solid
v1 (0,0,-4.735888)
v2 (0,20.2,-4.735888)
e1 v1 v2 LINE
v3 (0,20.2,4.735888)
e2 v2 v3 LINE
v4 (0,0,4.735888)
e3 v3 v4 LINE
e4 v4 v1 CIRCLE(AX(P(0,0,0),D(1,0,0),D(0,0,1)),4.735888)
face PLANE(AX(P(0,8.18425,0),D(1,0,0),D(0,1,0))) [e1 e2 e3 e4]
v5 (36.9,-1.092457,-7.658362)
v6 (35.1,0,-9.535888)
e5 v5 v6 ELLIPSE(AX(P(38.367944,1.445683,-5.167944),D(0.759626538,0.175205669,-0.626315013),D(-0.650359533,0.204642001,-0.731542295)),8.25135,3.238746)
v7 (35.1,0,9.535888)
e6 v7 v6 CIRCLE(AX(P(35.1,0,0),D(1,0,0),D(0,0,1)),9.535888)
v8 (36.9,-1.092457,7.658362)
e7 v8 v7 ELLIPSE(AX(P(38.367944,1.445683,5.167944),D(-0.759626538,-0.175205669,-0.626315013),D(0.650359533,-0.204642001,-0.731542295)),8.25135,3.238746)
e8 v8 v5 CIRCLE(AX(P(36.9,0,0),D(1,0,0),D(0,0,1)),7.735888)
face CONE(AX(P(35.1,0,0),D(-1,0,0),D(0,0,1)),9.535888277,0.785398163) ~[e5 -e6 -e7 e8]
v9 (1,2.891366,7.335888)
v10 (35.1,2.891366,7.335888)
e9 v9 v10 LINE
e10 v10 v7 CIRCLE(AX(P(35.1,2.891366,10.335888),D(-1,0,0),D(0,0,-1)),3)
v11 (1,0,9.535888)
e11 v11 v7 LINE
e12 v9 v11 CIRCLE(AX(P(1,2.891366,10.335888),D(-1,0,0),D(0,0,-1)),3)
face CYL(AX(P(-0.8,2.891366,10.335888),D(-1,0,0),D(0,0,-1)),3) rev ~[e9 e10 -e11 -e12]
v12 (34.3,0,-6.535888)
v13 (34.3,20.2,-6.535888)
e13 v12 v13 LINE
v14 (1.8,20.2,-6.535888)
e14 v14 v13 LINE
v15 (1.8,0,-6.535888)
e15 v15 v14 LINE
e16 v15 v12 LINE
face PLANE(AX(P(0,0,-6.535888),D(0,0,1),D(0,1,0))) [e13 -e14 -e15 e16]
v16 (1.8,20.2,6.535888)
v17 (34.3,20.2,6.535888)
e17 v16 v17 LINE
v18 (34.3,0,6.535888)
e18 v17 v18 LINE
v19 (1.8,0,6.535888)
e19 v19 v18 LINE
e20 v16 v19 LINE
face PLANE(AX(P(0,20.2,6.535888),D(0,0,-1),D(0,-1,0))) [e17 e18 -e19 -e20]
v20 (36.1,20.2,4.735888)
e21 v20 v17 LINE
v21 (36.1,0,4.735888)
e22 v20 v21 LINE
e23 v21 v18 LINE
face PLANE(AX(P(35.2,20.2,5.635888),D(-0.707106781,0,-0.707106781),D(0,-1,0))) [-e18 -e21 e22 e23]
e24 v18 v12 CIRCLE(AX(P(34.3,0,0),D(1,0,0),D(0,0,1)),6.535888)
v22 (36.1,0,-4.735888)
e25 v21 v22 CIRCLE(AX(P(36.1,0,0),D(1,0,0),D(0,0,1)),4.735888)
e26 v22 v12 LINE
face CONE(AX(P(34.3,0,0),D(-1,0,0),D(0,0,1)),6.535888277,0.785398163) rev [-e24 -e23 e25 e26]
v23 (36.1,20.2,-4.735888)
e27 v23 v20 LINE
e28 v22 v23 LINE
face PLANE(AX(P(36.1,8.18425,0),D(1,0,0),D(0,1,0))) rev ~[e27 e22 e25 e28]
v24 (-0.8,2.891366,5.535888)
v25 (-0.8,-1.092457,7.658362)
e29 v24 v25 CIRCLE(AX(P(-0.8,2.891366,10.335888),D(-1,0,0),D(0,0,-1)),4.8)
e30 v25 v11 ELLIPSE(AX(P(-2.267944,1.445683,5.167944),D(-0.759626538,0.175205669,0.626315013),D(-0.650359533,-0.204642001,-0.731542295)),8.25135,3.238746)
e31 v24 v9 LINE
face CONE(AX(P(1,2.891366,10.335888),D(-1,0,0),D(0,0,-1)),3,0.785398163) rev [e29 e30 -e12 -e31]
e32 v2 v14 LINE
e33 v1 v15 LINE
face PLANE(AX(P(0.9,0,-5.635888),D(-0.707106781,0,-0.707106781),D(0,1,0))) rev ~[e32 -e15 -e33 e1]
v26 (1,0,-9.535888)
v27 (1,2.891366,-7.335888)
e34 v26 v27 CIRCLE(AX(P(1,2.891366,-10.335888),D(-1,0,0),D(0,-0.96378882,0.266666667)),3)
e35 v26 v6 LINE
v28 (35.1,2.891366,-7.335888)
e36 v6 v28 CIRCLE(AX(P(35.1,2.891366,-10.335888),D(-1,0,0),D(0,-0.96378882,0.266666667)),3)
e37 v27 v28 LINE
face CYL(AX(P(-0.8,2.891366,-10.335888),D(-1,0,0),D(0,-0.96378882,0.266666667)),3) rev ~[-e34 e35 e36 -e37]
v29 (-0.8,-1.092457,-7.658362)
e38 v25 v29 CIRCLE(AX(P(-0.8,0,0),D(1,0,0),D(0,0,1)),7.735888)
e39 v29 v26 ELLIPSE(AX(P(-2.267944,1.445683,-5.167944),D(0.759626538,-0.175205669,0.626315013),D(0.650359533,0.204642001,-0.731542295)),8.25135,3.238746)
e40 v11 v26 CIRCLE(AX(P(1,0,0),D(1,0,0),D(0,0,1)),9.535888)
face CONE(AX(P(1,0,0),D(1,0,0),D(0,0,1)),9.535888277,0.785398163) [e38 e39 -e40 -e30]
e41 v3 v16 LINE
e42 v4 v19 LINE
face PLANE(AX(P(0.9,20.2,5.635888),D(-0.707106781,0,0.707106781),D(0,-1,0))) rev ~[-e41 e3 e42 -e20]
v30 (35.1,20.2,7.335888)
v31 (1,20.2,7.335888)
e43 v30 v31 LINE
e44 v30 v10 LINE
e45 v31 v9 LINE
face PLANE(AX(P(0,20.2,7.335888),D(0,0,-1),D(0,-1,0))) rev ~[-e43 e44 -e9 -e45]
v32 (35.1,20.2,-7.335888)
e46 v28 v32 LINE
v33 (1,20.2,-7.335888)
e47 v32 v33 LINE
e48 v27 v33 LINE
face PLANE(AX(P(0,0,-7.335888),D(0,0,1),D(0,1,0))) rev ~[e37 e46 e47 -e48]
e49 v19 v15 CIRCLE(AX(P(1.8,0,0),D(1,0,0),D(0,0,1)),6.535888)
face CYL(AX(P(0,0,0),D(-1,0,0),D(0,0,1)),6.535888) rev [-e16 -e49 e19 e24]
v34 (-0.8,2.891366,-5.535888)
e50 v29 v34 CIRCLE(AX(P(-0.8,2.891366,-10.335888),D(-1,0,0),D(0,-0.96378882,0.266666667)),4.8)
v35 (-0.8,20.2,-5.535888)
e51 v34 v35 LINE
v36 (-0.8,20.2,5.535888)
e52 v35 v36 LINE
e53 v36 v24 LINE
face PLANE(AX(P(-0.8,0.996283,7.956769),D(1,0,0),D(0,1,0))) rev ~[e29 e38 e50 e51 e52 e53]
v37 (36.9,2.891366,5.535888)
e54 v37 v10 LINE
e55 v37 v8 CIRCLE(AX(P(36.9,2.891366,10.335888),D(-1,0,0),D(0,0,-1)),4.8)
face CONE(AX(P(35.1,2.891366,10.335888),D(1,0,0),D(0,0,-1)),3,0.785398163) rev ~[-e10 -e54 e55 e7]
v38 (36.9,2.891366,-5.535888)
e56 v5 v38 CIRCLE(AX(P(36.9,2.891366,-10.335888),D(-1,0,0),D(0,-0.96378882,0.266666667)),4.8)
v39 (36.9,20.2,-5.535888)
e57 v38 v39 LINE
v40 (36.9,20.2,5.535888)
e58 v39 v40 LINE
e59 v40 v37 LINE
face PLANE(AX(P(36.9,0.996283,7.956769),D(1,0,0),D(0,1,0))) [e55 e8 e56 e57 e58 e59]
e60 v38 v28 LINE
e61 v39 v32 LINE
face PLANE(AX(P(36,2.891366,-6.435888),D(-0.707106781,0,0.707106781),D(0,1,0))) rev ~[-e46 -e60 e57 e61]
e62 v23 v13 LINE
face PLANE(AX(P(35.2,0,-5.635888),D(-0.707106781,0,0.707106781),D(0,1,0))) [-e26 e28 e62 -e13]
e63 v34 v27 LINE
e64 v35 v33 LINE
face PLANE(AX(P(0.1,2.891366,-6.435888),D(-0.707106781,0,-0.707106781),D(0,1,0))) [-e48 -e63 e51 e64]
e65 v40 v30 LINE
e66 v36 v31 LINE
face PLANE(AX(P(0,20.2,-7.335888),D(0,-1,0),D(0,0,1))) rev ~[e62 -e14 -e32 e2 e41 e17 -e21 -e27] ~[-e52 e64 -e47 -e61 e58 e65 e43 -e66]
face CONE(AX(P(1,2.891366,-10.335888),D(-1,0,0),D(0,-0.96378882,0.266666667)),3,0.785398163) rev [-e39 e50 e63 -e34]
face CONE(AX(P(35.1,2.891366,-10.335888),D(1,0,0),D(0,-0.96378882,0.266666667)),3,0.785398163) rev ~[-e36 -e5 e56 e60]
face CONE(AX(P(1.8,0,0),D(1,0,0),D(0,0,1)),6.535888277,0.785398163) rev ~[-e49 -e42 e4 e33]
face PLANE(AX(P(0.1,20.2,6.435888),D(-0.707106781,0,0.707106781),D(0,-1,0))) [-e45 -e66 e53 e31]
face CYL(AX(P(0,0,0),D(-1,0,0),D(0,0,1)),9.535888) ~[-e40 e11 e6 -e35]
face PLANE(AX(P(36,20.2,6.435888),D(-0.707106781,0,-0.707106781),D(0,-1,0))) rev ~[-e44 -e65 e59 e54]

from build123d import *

# Parameters (mm, degrees)
F4_DEPTH      = 0.8
F4_DEPTH_BACK = 36.9
F5_DEPTH      = 36.1
F6_T1_DEPTH   = 37.7
F7_SIZE       = 1.8
F8_SIZE       = 1.8


# Not quite as in the source:
# - a fillet or chamfer that OpenCascade refuses, or shapes differently, is made with other operations: its cross-section is extruded or revolved along the edge and cut away or added


with BuildPart() as f4:
    # F3 (on Right) → F4 (new body, two sides)
    with BuildSketch(Plane.YZ) as f4_sk:
        with BuildLine():
            Line((20.2, 6.5358882766), (0, 6.5358882766))
            ThreePointArc((0, 6.5358882766), (-6.5358882766, 0), (0, -6.5358882766))
            Line((0, -6.5358882766), (20.2, -6.5358882766))
            Line((20.2, -6.5358882766), (20.2, 6.5358882766))
        make_face()
        with BuildLine():
            ThreePointArc((0, -6.5358882766), (-6.5358882766, 0), (0, 6.5358882766))
            Line((0, 6.5358882766), (20.2, 6.5358882766))
            Line((20.2, 6.5358882766), (20.2, 7.3358882766))
            Line((20.2, 7.3358882766), (0, 7.3358882766))
            Line((0, 7.3358882766), (0, 9.5358882766))
            ThreePointArc((0, 9.5358882766), (-9.5358882766, 0), (0, -9.5358882766))
            Line((0, -9.5358882766), (0, -7.3358882766))
            Line((0, -7.3358882766), (20.2, -7.3358882766))
            Line((20.2, -7.3358882766), (20.2, -6.5358882766))
            Line((20.2, -6.5358882766), (0, -6.5358882766))
        make_face()
    extrude(amount=-F4_DEPTH)
    extrude(f4_sk.sketch, amount=F4_DEPTH_BACK)

    # F3 (on Right) → F5 (cut)
    with BuildSketch(Plane.YZ):
        with BuildLine():
            Line((20.2, 6.5358882766), (0, 6.5358882766))
            ThreePointArc((0, 6.5358882766), (-6.5358882766, 0), (0, -6.5358882766))
            Line((0, -6.5358882766), (20.2, -6.5358882766))
            Line((20.2, -6.5358882766), (20.2, 6.5358882766))
        make_face()
    extrude(amount=F5_DEPTH, mode=Mode.SUBTRACT)

    # F6: fillet of radius 3 on 2 edges, made by hand

    # F6_s2 → F6_t1 (join)
    with BuildSketch(Plane.YZ.offset(-0.8)):
        with BuildLine():
            ThreePointArc((2.891366459, 7.3358882766), (1.0747762465, 7.9484209993), (0, 9.5358882766))
            Line((0, 9.5358882766), (0, 7.3358882766))
            Line((0, 7.3358882766), (2.891366459, 7.3358882766))
        make_face()
        with BuildLine():
            ThreePointArc((0, -9.5358882766), (1.0747762465, -7.9484209993), (2.891366459, -7.3358882766))
            Line((2.891366459, -7.3358882766), (0, -7.3358882766))
            Line((0, -7.3358882766), (0, -9.5358882766))
        make_face()
    extrude(amount=F6_T1_DEPTH)

    # F7
    f7_edges = [f4.edges().sort_by_distance(p)[0] for p in [
        (36.1, 10.1, 6.535888),
        (0, -6.535888, 0),
    ]]
    chamfer(f7_edges, length=F7_SIZE)

    # F8
    f8_edges = [f4.edges().sort_by_distance(p)[0] for p in [
        (36.9, 11.545683, 7.335888),
        (36.9, 1.074776, 7.948421),
        (36.9, -9.535888, 0),
        (36.9, 1.074776, -7.948421),
        (36.9, 11.545683, -7.335888),
        (-0.8, 11.545683, 7.335888),
        (-0.8, 1.074776, 7.948421),
        (-0.8, -9.535888, 0),
        (-0.8, 1.074776, -7.948421),
        (-0.8, 11.545683, -7.335888),
    ]]
    chamfer(f8_edges, length=F8_SIZE)


solid = f4.part
